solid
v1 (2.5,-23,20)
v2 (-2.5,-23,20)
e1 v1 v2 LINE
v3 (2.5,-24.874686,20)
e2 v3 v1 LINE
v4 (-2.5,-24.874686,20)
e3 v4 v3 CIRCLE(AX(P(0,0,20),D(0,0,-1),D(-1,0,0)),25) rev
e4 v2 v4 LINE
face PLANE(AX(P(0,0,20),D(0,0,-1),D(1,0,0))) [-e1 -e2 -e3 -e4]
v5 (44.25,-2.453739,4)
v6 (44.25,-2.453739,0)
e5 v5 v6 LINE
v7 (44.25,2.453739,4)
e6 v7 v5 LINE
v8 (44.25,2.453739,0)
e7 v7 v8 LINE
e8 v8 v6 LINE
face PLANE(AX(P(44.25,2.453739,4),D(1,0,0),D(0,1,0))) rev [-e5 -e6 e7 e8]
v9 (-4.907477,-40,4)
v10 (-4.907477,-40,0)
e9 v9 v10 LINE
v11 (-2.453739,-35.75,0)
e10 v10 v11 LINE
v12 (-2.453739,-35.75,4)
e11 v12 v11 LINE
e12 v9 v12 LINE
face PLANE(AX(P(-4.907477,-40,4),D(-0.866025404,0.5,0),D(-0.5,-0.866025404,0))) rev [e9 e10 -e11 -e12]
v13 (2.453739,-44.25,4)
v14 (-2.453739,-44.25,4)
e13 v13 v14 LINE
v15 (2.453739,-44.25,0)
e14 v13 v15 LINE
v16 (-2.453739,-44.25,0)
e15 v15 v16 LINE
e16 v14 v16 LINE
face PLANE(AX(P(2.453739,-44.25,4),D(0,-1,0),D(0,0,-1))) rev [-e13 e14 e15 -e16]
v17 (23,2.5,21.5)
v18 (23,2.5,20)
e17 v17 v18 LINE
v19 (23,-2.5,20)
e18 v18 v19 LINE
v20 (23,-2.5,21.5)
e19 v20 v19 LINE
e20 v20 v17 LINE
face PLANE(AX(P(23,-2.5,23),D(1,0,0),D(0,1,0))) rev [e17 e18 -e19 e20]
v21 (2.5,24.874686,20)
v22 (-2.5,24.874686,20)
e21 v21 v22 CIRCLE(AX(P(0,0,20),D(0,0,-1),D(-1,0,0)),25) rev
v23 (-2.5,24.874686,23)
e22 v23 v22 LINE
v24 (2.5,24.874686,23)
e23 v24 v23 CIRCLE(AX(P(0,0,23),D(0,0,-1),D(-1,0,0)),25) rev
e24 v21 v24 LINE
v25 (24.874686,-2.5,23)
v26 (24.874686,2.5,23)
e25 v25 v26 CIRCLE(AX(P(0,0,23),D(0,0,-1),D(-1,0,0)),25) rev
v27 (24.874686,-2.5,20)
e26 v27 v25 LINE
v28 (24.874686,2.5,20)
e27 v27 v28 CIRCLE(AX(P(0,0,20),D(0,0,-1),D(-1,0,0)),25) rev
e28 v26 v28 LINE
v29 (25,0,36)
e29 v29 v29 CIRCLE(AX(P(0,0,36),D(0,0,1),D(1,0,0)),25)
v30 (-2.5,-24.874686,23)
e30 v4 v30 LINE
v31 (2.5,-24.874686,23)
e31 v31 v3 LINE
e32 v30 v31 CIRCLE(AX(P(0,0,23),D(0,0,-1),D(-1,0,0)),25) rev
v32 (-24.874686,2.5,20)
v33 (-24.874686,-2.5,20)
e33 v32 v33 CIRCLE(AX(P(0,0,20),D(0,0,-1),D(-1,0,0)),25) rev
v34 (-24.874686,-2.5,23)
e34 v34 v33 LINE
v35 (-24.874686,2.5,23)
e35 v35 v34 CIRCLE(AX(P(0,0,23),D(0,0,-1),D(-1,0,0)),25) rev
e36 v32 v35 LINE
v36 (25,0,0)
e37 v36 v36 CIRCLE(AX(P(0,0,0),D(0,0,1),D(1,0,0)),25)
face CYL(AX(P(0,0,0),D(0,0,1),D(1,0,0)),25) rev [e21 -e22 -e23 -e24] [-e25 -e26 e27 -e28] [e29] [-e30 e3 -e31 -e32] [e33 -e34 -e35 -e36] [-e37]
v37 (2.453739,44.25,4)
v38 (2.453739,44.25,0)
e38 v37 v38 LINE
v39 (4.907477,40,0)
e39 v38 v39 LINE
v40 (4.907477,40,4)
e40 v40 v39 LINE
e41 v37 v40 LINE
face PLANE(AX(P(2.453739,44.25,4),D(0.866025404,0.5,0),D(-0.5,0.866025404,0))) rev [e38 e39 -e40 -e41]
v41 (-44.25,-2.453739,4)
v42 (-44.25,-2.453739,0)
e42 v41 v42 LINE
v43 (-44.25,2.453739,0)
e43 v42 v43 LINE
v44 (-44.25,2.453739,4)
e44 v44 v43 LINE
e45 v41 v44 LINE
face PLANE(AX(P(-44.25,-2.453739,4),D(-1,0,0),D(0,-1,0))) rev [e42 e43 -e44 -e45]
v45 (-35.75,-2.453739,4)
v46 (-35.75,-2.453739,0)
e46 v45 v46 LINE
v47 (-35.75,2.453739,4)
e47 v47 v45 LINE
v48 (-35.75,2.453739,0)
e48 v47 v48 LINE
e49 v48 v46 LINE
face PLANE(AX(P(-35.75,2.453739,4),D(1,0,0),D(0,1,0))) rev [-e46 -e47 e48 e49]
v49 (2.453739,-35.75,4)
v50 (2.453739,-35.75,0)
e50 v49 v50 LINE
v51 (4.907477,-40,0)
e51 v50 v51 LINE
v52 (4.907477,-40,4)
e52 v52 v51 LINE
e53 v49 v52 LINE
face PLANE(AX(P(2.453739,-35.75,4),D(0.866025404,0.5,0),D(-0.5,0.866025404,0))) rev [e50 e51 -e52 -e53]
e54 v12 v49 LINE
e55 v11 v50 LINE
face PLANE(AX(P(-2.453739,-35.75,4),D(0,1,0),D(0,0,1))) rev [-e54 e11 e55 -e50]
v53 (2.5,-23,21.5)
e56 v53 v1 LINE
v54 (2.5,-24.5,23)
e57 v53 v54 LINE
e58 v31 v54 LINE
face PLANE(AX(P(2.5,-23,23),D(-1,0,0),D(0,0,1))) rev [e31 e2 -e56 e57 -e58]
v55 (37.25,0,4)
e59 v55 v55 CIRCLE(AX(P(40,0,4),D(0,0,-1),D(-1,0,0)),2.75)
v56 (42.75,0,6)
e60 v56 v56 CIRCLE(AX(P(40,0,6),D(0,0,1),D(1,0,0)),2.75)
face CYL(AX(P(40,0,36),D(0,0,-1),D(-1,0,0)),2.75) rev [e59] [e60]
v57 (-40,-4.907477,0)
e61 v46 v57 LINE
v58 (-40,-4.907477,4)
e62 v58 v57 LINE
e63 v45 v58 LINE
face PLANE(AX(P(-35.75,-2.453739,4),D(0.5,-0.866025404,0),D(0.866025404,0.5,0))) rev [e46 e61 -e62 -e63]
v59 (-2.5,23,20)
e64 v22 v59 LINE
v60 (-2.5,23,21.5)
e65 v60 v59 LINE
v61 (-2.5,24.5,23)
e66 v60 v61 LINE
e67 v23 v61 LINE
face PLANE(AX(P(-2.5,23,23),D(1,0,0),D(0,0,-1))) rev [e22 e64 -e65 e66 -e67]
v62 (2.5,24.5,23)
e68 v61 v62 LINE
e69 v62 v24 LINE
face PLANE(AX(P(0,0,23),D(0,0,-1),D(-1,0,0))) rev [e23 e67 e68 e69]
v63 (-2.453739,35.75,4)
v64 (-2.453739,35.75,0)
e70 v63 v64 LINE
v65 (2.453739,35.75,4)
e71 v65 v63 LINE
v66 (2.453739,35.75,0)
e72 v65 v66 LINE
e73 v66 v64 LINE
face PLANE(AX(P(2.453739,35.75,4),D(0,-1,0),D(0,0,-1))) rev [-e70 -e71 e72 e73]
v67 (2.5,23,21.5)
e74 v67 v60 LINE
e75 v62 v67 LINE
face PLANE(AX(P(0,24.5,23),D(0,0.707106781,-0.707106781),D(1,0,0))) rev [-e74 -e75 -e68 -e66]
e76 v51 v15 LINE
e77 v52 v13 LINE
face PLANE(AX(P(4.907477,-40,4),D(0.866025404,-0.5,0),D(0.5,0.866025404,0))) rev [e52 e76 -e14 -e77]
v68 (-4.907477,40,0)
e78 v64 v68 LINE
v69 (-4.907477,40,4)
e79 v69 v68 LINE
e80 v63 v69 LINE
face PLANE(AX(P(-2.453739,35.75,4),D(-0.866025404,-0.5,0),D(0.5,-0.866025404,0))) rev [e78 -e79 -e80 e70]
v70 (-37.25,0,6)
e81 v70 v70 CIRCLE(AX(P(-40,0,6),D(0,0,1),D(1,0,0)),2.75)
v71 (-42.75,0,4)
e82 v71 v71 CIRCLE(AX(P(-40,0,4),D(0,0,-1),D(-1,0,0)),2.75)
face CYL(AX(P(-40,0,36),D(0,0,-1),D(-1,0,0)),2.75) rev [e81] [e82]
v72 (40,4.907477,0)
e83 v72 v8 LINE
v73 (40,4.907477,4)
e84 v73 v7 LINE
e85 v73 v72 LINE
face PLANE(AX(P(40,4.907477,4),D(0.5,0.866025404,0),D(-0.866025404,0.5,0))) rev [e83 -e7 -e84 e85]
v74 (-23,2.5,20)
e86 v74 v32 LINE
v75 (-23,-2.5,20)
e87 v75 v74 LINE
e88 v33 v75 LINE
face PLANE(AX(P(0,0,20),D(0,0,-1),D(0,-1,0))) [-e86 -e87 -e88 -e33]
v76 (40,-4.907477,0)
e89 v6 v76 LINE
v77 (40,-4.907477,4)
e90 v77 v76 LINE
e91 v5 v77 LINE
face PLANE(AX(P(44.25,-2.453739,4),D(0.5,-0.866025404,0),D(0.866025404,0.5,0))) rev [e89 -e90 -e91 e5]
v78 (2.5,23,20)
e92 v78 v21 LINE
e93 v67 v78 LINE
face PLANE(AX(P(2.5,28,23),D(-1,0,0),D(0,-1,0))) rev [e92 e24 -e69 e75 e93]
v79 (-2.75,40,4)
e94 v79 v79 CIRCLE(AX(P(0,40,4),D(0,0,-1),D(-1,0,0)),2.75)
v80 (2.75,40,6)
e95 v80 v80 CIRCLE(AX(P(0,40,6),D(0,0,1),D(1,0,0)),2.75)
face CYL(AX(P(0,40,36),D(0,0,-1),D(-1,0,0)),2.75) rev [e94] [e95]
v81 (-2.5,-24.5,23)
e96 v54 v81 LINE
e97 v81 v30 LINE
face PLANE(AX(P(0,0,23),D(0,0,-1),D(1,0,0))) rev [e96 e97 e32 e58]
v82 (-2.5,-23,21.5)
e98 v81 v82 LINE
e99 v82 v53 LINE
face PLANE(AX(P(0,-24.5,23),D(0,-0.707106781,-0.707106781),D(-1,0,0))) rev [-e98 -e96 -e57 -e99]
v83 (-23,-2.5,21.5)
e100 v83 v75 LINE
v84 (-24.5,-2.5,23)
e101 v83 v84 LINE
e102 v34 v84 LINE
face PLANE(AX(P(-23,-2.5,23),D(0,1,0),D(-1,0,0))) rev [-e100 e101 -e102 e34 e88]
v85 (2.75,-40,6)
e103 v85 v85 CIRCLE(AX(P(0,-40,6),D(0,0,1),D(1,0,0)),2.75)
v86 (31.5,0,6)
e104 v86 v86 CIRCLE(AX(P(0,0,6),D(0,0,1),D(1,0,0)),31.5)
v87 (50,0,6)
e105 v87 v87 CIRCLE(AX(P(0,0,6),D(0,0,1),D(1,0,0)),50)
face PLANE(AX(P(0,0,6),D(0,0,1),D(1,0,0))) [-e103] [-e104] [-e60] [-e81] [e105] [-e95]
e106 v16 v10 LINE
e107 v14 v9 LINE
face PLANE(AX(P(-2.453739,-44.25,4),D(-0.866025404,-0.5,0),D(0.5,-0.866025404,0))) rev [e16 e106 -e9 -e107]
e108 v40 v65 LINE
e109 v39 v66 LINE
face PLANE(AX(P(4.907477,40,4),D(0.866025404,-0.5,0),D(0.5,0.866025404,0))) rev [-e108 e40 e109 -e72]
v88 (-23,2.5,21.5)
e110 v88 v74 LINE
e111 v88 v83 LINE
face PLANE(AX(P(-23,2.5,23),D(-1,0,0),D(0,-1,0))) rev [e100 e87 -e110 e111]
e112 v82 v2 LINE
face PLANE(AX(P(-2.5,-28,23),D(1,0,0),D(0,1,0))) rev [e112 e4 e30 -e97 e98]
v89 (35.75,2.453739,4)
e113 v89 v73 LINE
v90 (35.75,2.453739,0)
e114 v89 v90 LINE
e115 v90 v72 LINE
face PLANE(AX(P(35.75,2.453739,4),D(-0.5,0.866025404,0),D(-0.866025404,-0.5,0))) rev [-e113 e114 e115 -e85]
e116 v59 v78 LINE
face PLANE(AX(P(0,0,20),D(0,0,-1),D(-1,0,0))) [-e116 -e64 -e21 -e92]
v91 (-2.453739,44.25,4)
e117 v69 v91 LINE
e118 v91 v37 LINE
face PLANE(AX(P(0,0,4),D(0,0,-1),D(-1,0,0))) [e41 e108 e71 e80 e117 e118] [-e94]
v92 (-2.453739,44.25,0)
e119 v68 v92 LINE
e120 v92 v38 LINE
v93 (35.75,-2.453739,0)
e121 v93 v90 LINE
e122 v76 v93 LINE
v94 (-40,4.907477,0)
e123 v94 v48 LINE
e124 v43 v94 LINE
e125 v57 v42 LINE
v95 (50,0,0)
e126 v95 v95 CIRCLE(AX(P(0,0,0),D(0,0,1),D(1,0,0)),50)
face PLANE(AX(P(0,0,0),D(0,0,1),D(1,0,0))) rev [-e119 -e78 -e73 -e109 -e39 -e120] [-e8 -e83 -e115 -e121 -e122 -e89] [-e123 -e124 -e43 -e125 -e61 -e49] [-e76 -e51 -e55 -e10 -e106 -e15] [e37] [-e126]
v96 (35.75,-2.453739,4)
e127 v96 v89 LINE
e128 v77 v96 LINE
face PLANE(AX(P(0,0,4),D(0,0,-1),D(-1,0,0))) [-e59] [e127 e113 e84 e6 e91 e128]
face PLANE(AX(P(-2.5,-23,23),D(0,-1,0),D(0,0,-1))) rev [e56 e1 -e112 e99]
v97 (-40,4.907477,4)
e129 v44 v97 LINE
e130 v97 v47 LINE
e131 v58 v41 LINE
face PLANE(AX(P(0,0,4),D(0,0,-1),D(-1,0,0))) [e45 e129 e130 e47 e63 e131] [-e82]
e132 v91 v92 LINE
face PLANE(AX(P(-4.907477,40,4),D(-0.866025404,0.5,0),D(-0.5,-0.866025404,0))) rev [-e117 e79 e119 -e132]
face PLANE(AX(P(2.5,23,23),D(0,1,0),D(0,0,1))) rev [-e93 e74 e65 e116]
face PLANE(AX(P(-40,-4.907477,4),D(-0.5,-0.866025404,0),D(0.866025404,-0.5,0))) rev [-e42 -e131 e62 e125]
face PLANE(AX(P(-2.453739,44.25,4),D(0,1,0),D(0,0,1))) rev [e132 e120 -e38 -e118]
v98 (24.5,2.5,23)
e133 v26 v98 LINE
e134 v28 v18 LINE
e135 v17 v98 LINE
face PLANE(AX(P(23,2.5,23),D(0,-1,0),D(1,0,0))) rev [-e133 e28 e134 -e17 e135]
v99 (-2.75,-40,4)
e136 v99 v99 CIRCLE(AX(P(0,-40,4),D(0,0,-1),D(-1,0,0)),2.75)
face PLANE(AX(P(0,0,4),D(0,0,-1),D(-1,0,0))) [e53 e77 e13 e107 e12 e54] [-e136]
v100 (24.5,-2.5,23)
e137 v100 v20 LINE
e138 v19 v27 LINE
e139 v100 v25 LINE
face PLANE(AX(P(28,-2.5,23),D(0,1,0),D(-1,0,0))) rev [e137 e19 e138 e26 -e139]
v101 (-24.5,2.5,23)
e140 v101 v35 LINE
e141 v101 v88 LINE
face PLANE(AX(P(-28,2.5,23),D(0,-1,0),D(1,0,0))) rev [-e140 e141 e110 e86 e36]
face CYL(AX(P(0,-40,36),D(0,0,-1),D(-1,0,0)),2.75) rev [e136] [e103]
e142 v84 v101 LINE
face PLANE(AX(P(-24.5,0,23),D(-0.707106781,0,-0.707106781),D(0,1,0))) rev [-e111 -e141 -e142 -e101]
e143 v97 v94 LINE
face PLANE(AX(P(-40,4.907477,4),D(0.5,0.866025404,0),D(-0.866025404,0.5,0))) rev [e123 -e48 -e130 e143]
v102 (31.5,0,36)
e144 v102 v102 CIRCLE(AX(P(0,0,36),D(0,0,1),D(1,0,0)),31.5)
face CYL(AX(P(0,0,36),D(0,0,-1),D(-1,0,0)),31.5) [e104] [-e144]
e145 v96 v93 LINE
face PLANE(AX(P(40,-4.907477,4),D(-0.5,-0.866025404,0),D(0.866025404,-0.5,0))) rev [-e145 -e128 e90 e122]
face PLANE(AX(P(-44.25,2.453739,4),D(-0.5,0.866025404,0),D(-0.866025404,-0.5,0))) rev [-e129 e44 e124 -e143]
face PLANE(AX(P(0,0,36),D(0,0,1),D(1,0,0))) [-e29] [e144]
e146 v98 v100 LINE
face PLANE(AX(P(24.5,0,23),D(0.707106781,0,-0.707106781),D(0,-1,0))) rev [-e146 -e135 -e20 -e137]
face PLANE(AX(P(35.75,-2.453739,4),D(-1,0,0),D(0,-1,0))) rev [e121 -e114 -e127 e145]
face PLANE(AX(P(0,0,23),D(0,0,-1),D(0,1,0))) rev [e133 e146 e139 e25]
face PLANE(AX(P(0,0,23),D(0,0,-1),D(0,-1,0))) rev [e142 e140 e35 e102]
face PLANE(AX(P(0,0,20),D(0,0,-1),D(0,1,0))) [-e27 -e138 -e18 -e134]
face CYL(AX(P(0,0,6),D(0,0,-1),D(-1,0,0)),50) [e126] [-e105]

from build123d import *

# Parameters (mm, degrees)
SZKIC1_R                         = 50
DODANIE_WYCI_GNI_CIE1_DEPTH      = 6
SZKIC2_R                         = 31.5
DODANIE_WYCI_GNI_CIE2_DEPTH      = 30
SZKIC3_R                         = 25
WYTNIJ_WYCI_GNI_CIE1_DEPTH       = 80.3473377
SZKIC4_W                         = 5
SZKIC4_H                         = 5
DODANIE_WYCI_GNI_CIE3_DEPTH      = 3
SFAZOWANIE2_SIZE                 = 1.5
SZYK_KO_OWY3_COUNT               = 4
SFAZOWANIE2_OF_SZYK_KO_OWY3_SIZE = 1.5
WYTNIJ_WYCI_GNI_CIE2_DEPTH       = 4
SZKIC6_R                         = 2.75
WYTNIJ_WYCI_GNI_CIE3_DEPTH       = 78.614431648


with BuildPart() as part:
    # Szkic1 → Dodanie-wyciągnięcie1 (new body)
    with BuildSketch(Plane.XY):
        Circle(SZKIC1_R)
    extrude(amount=DODANIE_WYCI_GNI_CIE1_DEPTH)

    # Szkic2 → Dodanie-wyciągnięcie2 (add)
    with BuildSketch(Plane.XY.offset(6)):
        Circle(SZKIC2_R)
    extrude(amount=DODANIE_WYCI_GNI_CIE2_DEPTH)

    # Szkic3 → Wytnij-wyciągnięcie1 (cut, through all)
    with BuildSketch(Plane.XY.offset(36)):
        Circle(SZKIC3_R)
    extrude(amount=-WYTNIJ_WYCI_GNI_CIE1_DEPTH, mode=Mode.SUBTRACT)

    # Szkic4 → Dodanie-wyciągnięcie3 (add)
    with BuildSketch(Plane.XY.offset(20)):
        with Locations((0, 25.5)):
            Rectangle(SZKIC4_W, SZKIC4_H)
    dodanie_wyci_gni_cie3 = extrude(amount=DODANIE_WYCI_GNI_CIE3_DEPTH)

    # Sfazowanie2
    sfazowanie2_edges = [part.edges().sort_by_distance(p)[0] for p in [
        (0, 23, 23),
    ]]
    chamfer(sfazowanie2_edges, length=SFAZOWANIE2_SIZE)

    # Szyk kołowy3: Dodanie-wyciągnięcie3 ×4 about axis
    szyk_ko_owy3_axis = Axis((0, 0, 36), (0, 0, 1))
    for i in range(1, SZYK_KO_OWY3_COUNT):
        add(dodanie_wyci_gni_cie3.rotate(szyk_ko_owy3_axis, i * 360 / SZYK_KO_OWY3_COUNT))

    # Sfazowanie2 of Szyk kołowy3
    sfazowanie2_of_szyk_ko_owy3_edges = [part.edges().sort_by_distance(p)[0] for p in [
        (-23, 0, 23),
        (0, -23, 23),
        (23, 0, 23),
    ]]
    chamfer(sfazowanie2_of_szyk_ko_owy3_edges, length=SFAZOWANIE2_OF_SZYK_KO_OWY3_SIZE)

    # Szkic5 → Wytnij-wyciągnięcie2 (cut)
    with BuildSketch(Plane(origin=(0, 0, 0), x_dir=(-1, 0, 0), z_dir=(0, 0, -1))):
        Polygon((40, -4.907477288), (44.25, -2.453738644), (44.25, 2.453738644), (40, 4.907477288), (35.75, 2.453738644), (35.75, -2.453738644), align=None)
        Polygon((4.907477288, 40), (2.453738644, 44.25), (-2.453738644, 44.25), (-4.907477288, 40), (-2.453738644, 35.75), (2.453738644, 35.75), align=None)
        Polygon((-4.907477288, -40), (-2.453738644, -44.25), (2.453738644, -44.25), (4.907477288, -40), (2.453738644, -35.75), (-2.453738644, -35.75), align=None)
        Polygon((-40, 4.907477288), (-44.25, 2.453738644), (-44.25, -2.453738644), (-40, -4.907477288), (-35.75, -2.453738644), (-35.75, 2.453738644), align=None)
    extrude(amount=-WYTNIJ_WYCI_GNI_CIE2_DEPTH, mode=Mode.SUBTRACT)

    # Szkic6 → Wytnij-wyciągnięcie3 (cut, through all)
    with BuildSketch(Plane(origin=(0, 0, 4), x_dir=(-1, 0, 0), z_dir=(0, 0, -1))):
        with Locations((0, 40)):
            Circle(SZKIC6_R)
        with Locations((40, 0)):
            Circle(SZKIC6_R)
        with Locations((0, -40)):
            Circle(SZKIC6_R)
        with Locations((-40, 0)):
            Circle(SZKIC6_R)
    extrude(amount=-WYTNIJ_WYCI_GNI_CIE3_DEPTH, mode=Mode.SUBTRACT)


solid = part.part
